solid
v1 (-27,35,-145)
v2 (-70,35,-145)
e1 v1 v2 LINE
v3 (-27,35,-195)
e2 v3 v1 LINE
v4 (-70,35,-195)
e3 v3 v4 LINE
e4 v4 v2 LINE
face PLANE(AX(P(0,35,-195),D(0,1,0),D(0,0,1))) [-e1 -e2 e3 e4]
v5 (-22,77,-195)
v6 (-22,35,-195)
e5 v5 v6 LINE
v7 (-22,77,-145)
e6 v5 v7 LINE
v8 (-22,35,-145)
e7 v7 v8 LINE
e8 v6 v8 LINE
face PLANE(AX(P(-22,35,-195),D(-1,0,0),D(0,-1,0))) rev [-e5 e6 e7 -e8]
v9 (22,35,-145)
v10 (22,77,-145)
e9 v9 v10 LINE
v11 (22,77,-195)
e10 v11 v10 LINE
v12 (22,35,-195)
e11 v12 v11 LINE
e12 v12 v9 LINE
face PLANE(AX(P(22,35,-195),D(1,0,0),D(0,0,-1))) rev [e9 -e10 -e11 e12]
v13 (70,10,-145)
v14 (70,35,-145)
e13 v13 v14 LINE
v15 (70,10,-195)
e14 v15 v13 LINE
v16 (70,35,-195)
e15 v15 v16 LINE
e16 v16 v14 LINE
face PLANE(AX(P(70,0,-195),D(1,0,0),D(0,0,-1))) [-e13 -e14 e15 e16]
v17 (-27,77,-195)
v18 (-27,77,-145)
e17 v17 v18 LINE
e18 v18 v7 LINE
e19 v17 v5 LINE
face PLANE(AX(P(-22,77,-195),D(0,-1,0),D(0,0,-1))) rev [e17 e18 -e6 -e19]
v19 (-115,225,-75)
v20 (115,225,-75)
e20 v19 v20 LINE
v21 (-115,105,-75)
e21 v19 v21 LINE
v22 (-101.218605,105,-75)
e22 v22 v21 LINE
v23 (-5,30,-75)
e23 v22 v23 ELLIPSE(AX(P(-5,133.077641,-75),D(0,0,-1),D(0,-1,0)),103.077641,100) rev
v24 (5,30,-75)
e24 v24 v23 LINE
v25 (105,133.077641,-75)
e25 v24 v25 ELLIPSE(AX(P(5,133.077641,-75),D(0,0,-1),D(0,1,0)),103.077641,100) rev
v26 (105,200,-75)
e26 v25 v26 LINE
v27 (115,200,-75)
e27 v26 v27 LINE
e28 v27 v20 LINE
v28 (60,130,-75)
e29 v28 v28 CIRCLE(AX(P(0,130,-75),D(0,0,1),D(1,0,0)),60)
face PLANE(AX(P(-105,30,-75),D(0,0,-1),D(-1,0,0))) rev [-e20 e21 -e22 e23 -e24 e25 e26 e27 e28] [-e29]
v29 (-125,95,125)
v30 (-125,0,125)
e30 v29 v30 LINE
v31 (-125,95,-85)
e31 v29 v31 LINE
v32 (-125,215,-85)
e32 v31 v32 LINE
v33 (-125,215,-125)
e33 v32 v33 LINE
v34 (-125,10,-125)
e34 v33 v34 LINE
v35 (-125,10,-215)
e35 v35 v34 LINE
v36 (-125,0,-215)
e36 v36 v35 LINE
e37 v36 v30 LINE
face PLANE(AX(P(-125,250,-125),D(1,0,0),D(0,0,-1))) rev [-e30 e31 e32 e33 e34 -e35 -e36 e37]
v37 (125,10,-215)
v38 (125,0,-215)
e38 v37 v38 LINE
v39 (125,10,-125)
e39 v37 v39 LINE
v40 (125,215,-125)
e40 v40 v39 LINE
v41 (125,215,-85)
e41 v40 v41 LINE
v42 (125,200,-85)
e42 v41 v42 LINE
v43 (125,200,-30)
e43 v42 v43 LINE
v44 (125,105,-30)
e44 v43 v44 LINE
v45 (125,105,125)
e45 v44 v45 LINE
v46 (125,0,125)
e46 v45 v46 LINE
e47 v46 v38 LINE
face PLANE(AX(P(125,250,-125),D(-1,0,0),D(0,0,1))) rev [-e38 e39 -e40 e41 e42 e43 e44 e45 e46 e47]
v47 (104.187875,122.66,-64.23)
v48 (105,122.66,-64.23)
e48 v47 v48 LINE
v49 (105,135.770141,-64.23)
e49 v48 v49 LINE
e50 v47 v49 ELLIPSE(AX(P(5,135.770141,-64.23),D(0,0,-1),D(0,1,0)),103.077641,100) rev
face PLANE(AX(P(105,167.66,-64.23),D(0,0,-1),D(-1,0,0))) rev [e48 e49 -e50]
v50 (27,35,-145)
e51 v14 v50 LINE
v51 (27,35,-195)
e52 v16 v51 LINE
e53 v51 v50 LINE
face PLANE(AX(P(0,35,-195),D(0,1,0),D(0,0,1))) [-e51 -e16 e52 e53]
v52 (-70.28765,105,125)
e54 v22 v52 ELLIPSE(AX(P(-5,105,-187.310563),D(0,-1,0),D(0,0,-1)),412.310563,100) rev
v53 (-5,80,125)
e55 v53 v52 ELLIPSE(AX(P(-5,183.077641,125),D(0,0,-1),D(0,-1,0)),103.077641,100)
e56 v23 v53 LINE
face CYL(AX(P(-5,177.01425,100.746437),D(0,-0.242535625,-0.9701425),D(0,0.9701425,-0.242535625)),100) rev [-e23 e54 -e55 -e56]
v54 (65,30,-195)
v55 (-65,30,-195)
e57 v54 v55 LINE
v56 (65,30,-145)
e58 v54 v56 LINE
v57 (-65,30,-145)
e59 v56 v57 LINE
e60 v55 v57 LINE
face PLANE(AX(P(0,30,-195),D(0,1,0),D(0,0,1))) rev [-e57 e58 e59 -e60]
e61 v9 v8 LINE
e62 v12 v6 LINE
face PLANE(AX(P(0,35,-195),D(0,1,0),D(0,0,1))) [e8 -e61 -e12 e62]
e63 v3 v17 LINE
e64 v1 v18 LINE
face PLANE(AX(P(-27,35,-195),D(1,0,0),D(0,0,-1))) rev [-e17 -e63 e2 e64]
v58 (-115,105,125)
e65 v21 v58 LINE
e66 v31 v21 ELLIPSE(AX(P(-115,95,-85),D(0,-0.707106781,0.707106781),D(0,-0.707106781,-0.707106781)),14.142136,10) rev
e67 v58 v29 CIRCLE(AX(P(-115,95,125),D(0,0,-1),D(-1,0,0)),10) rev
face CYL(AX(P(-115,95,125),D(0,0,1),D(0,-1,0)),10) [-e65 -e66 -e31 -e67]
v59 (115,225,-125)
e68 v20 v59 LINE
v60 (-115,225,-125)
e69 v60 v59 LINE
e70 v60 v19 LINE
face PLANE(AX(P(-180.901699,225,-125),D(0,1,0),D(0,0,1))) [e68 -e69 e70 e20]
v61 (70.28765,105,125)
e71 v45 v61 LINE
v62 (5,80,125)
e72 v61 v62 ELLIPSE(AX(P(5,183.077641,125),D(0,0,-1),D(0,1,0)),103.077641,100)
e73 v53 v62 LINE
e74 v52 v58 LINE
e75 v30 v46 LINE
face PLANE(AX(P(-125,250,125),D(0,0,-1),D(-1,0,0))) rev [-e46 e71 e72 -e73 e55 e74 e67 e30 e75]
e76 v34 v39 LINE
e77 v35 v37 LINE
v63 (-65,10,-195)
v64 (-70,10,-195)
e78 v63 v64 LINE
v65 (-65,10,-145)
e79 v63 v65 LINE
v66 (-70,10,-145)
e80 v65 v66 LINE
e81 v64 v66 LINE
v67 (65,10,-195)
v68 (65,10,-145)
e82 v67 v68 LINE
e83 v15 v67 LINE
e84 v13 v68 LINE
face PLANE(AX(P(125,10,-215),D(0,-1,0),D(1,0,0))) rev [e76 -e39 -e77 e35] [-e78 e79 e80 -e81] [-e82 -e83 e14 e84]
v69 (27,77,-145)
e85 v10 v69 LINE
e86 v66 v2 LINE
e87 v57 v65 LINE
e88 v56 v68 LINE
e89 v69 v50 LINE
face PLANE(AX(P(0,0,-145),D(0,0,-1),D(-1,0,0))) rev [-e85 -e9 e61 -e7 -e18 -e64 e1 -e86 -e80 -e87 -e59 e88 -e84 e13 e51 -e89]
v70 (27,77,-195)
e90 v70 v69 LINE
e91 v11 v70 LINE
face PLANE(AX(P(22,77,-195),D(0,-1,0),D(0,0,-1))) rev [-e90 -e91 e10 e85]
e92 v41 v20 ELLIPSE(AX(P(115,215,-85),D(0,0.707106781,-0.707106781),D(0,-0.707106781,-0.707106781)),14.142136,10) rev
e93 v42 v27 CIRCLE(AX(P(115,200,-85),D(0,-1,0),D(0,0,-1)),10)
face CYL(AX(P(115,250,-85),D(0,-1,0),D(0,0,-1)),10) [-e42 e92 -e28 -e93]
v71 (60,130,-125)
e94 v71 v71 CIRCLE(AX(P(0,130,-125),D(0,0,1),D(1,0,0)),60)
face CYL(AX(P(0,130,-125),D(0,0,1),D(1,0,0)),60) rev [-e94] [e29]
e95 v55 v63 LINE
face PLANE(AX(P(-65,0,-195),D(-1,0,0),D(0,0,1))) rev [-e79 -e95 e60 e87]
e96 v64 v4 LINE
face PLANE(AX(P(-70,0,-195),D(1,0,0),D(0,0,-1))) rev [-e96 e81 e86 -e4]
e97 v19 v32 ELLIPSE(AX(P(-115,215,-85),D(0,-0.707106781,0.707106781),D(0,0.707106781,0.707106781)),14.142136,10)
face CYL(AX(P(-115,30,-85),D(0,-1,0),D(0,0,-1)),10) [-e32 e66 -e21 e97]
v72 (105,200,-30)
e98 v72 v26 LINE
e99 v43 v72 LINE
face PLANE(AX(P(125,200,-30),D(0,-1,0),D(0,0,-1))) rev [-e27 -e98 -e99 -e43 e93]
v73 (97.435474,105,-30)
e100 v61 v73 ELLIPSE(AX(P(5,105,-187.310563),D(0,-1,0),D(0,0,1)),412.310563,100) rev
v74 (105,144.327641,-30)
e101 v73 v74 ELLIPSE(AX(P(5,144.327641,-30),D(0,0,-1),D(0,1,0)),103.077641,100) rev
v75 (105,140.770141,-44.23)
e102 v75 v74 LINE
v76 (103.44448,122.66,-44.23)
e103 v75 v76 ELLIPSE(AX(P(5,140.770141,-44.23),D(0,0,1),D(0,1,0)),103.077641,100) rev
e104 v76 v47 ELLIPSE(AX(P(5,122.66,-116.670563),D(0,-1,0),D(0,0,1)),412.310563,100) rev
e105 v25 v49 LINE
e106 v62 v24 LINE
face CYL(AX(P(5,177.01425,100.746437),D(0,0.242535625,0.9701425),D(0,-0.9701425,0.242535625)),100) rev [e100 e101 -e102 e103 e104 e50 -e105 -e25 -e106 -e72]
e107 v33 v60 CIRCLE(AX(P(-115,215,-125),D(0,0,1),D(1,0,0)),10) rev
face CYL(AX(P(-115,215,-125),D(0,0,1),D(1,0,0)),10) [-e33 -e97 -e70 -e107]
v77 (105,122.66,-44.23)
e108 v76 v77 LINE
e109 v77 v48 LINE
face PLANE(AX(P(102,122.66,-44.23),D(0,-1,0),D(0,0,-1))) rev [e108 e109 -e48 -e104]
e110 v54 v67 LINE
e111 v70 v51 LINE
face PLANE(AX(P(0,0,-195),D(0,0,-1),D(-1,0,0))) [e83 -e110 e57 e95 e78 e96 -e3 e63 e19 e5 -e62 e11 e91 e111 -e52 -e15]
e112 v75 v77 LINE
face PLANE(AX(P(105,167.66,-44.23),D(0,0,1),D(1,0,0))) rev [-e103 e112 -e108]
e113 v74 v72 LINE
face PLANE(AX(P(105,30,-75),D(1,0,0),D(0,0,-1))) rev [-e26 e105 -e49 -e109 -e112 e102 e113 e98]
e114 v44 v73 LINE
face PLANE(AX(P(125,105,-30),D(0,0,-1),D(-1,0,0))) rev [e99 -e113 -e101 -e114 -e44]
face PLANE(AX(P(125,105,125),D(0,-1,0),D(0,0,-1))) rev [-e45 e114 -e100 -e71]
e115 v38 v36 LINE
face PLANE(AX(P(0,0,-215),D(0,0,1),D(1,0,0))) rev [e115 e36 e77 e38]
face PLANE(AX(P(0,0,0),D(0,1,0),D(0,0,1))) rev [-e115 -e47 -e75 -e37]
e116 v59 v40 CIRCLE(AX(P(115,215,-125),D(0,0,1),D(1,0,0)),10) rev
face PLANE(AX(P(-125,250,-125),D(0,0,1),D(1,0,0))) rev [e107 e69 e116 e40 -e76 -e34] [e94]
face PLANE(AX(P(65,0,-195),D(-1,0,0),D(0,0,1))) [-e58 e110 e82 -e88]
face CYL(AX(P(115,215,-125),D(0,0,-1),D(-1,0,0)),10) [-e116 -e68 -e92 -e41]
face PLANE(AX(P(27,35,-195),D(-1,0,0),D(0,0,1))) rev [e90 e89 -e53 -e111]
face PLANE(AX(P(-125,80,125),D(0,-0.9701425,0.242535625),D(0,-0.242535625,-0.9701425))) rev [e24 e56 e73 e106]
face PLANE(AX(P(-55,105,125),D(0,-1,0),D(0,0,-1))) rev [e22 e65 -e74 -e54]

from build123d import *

# Parameters (mm, degrees)
SKETCH2_W                = 250
SKETCH2_H                = 250
BOSS_EXTRUDE1_DEPTH      = 250
SKETCH3_W                = 210
SKETCH3_H                = 200
CUT_EXTRUDE1_DEPTH       = 220
BOSS_EXTRUDE2_REACH      = 363.974
FILLET1_R                = 100
FILLET2_R                = 20
SKETCH11_R               = 60
CUT_EXTRUDE2_DEPTH       = 344.693177122
SKETCH12_W               = 250
SKETCH12_H               = 10
BOSS_EXTRUDE3_DEPTH      = 90
BOSS_EXTRUDE4_START      = 20
SKETCH13_W               = 5
SKETCH13_H               = 20
BOSS_EXTRUDE4_DEPTH      = 50
BOSS_EXTRUDE5_START      = 20
SKETCH14_W               = 5
SKETCH14_H               = 42
BOSS_EXTRUDE5_DEPTH      = 50
SKETCH15_W               = 20
SKETCH15_H               = 40
CUT_EXTRUDE3_DEPTH       = 20
SKETCH17_W               = 20
SKETCH17_H               = 40
CUT_EXTRUDE5_DEPTH       = 23
SKETCH18_W               = 20
SKETCH18_H               = 10
BOSS_EXTRUDE6_DEPTH      = 20
SKETCH19_W               = 250
SKETCH19_H               = 50
CUT_EXTRUDE11_DEPTH      = 70
SKETCH24_W               = 200
SKETCH24_H               = 95
CUT_EXTRUDE12_DEPTH      = 70
CUT_EXTRUDE14_DEPTH      = 414.793426724
SKETCH26_W               = 75
SKETCH26_H               = 50
CUT_EXTRUDE15_DEPTH      = 344.693177122
BOSS_EXTRUDE7_REACH      = 415.793
SKETCH27_W               = 50
SKETCH27_H               = 25
CUT_EXTRUDE16_DEPTH      = 374.296129099
CUT_EXTRUDE16_DEPTH_BACK = 374.296129099
SKETCH28_W               = 50
SKETCH28_H               = 25
FILLET3_R                = 10
SKETCH29_W               = 20
SKETCH29_H               = 39.615
BOSS_EXTRUDE8_DEPTH      = 95


with BuildPart() as part:
    # Sketch2 → Boss-Extrude1 (new body)
    with BuildSketch(Plane(origin=(0, 0, 0), x_dir=(1, 0, 0), z_dir=(0, 1, 0))):
        Rectangle(SKETCH2_W, SKETCH2_H)
    extrude(amount=BOSS_EXTRUDE1_DEPTH)

    # Sketch3 → Cut-Extrude1 (cut)
    with BuildSketch(Plane(origin=(0, 250, 0), x_dir=(1, 0, 0), z_dir=(0, 1, 0))):
        with Locations((0, -25)):
            Rectangle(SKETCH3_W, SKETCH3_H)
    extrude(amount=-CUT_EXTRUDE1_DEPTH, mode=Mode.SUBTRACT)

    # Sketch5 → Boss-Extrude2 (add, up to next)
    with BuildSketch(Plane.ZY.offset(-105), mode=Mode.PRIVATE) as boss_extrude2_sk1:
        Polygon((125, 30), (125, 80), (-75, 30), align=None)
    boss_extrude2_tool1 = extrude(boss_extrude2_sk1.sketch, amount=BOSS_EXTRUDE2_REACH, mode=Mode.PRIVATE) - part.part
    add(boss_extrude2_tool1.solids().sort_by_distance((105, 46.666667, 58.333333))[0])

    # Fillet1
    fillet1_edges = [part.edges().sort_by_distance(p)[0] for p in [
        (-105, 55, 25),
        (105, 55, 25),
    ]]
    fillet(fillet1_edges, radius=FILLET1_R)

    # Fillet2
    fillet2_edges = [part.edges().sort_by_distance(p)[0] for p in [
        (115, 250, 125),
        (-115, 250, 125),
        (105, 250, 25),
        (0, 250, -75),
        (-105, 250, 25),
    ]]
    fillet(fillet2_edges, radius=FILLET2_R - 0.0001)  # a hair under: the kernel refuses the full size

    # Sketch11 → Cut-Extrude2 (cut, through all)
    with BuildSketch(Plane.XY.offset(-75)):
        with Locations((0, 130)):
            Circle(SKETCH11_R)
    extrude(amount=-CUT_EXTRUDE2_DEPTH, mode=Mode.SUBTRACT)

    # Sketch12 → Boss-Extrude3 (add)
    with BuildSketch(Plane(origin=(0, 0, -125), x_dir=(-1, 0, 0), z_dir=(0, 0, -1))):
        with Locations((0, 5)):
            Rectangle(SKETCH12_W, SKETCH12_H)
    extrude(amount=BOSS_EXTRUDE3_DEPTH)

    # Sketch13 → Boss-Extrude4 (add)
    with BuildSketch(Plane(origin=(0, 0, -125), x_dir=(-1, 0, 0), z_dir=(0, 0, -1)).offset(BOSS_EXTRUDE4_START)):
        Polygon((-70, 35), (-70, 30), (-65, 30), (0, 30), (0, 35), align=None)
        Polygon((0, 35), (0, 30), (65, 30), (70, 30), (70, 35), align=None)
        with Locations((67.5, 20)):
            Rectangle(SKETCH13_W, SKETCH13_H)
        with Locations((-67.5, 20)):
            Rectangle(SKETCH13_W, SKETCH13_H)
    extrude(amount=BOSS_EXTRUDE4_DEPTH)

    # Sketch14 → Boss-Extrude5 (add)
    with BuildSketch(Plane(origin=(0, 0, -125), x_dir=(-1, 0, 0), z_dir=(0, 0, -1)).offset(BOSS_EXTRUDE5_START)):
        with Locations((24.5, 56)):
            Rectangle(SKETCH14_W, SKETCH14_H)
        with Locations((-24.5, 56)):
            Rectangle(SKETCH14_W, SKETCH14_H)
    extrude(amount=BOSS_EXTRUDE5_DEPTH)

    # Sketch15 → Cut-Extrude3 (cut)
    with BuildSketch(Plane(origin=(125, 0, 0), x_dir=(0, 0, -1), z_dir=(1, 0, 0))):
        with Locations((54.23, 147.66)):
            Rectangle(SKETCH15_W, SKETCH15_H)
    extrude(amount=-CUT_EXTRUDE3_DEPTH, mode=Mode.SUBTRACT)

    # Sketch17 → Cut-Extrude5 (cut)
    with BuildSketch(Plane(origin=(125, 0, 0), x_dir=(0, 0, -1), z_dir=(1, 0, 0))):
        with Locations((54.23, 142.66)):
            Rectangle(SKETCH17_W, SKETCH17_H)
    extrude(amount=-CUT_EXTRUDE5_DEPTH, mode=Mode.SUBTRACT)

    # Sketch18 → Boss-Extrude6 (add)
    with BuildSketch(Plane(origin=(125, 0, 0), x_dir=(0, 0, -1), z_dir=(1, 0, 0))):
        with Locations((54.23, 162.66)):
            Rectangle(SKETCH18_W, SKETCH18_H)
    extrude(amount=-BOSS_EXTRUDE6_DEPTH)

    # Sketch19 → Cut-Extrude11 (cut)
    with BuildSketch(Plane.ZY.offset(125)):
        with Locations((0, 225)):
            Rectangle(SKETCH19_W, SKETCH19_H)
    extrude(amount=-CUT_EXTRUDE11_DEPTH, mode=Mode.SUBTRACT)

    # Sketch24 → Cut-Extrude12 (cut)
    with BuildSketch(Plane.ZY.offset(125)):
        with Locations((25, 152.5)):
            Rectangle(SKETCH24_W, SKETCH24_H)
    extrude(amount=-CUT_EXTRUDE12_DEPTH, mode=Mode.SUBTRACT)

    # Sketch25 → Cut-Extrude14 (cut, through all)
    with BuildSketch(Plane.ZY.offset(125)):
        Polygon((125, 105), (-30, 105), (-30, 200), (-75, 200), (-75, 250), (125, 250), align=None)
    extrude(amount=-CUT_EXTRUDE14_DEPTH, mode=Mode.SUBTRACT)

    # Sketch26 → Cut-Extrude15 (cut, through all)
    with BuildSketch(Plane.XY.offset(-75)):
        with Locations((87.5, 225)):
            Rectangle(SKETCH26_W, SKETCH26_H)
    extrude(amount=-CUT_EXTRUDE15_DEPTH, mode=Mode.SUBTRACT)

    # Boss-Extrude7: up to this face of the body (flat: up to its plane)
    boss_extrude7_end = Plane(part.part.faces().sort_by_distance((-125, 66.05015674, -19.686520376))[0])
    # Sketch27 → Boss-Extrude7 (add, up to the picked face)
    with BuildSketch(Plane(origin=(125, 0, 0), x_dir=(0, 0, -1), z_dir=(1, 0, 0)), mode=Mode.PRIVATE) as boss_extrude7_sk1:
        with Locations((100, 212.5)):
            Rectangle(SKETCH27_W, SKETCH27_H)
    boss_extrude7_tool1 = split(extrude(boss_extrude7_sk1.sketch, amount=-BOSS_EXTRUDE7_REACH, mode=Mode.PRIVATE), bisect_by=boss_extrude7_end, keep=Keep.BOTH, mode=Mode.PRIVATE)
    add(boss_extrude7_tool1.solids().sort_by(Axis((125, 212.5, -100), (-1, 0, 0)))[0])

    # Sketch28 → Cut-Extrude16 (cut, two sides: drawn at the far end of the back side and taken through both)
    with BuildSketch(Plane(origin=(50, 0, 0), x_dir=(0, 0, -1), z_dir=(1, 0, 0)).offset(-CUT_EXTRUDE16_DEPTH_BACK)):
        with Locations((100, 237.5)):
            Rectangle(SKETCH28_W, SKETCH28_H)
    extrude(amount=CUT_EXTRUDE16_DEPTH + CUT_EXTRUDE16_DEPTH_BACK, mode=Mode.SUBTRACT)

    # Fillet3
    fillet3_edges = [part.edges().sort_by_distance(p)[0] for p in [
        (-125, 165, -75),
        (-125, 105, 25),
        (125, 225, -100),
        (125, 212.5, -75),
        (-125, 225, -100),
    ]]
    fillet(fillet3_edges, radius=FILLET3_R)

    # Sketch29 → Boss-Extrude8 (add)
    with BuildSketch(Plane(origin=(0, 200, 0), x_dir=(1, 0, 0), z_dir=(0, 1, 0))):
        with Locations((115, 49.8075)):
            Rectangle(SKETCH29_W, SKETCH29_H)
    extrude(amount=-BOSS_EXTRUDE8_DEPTH)


solid = part.part
